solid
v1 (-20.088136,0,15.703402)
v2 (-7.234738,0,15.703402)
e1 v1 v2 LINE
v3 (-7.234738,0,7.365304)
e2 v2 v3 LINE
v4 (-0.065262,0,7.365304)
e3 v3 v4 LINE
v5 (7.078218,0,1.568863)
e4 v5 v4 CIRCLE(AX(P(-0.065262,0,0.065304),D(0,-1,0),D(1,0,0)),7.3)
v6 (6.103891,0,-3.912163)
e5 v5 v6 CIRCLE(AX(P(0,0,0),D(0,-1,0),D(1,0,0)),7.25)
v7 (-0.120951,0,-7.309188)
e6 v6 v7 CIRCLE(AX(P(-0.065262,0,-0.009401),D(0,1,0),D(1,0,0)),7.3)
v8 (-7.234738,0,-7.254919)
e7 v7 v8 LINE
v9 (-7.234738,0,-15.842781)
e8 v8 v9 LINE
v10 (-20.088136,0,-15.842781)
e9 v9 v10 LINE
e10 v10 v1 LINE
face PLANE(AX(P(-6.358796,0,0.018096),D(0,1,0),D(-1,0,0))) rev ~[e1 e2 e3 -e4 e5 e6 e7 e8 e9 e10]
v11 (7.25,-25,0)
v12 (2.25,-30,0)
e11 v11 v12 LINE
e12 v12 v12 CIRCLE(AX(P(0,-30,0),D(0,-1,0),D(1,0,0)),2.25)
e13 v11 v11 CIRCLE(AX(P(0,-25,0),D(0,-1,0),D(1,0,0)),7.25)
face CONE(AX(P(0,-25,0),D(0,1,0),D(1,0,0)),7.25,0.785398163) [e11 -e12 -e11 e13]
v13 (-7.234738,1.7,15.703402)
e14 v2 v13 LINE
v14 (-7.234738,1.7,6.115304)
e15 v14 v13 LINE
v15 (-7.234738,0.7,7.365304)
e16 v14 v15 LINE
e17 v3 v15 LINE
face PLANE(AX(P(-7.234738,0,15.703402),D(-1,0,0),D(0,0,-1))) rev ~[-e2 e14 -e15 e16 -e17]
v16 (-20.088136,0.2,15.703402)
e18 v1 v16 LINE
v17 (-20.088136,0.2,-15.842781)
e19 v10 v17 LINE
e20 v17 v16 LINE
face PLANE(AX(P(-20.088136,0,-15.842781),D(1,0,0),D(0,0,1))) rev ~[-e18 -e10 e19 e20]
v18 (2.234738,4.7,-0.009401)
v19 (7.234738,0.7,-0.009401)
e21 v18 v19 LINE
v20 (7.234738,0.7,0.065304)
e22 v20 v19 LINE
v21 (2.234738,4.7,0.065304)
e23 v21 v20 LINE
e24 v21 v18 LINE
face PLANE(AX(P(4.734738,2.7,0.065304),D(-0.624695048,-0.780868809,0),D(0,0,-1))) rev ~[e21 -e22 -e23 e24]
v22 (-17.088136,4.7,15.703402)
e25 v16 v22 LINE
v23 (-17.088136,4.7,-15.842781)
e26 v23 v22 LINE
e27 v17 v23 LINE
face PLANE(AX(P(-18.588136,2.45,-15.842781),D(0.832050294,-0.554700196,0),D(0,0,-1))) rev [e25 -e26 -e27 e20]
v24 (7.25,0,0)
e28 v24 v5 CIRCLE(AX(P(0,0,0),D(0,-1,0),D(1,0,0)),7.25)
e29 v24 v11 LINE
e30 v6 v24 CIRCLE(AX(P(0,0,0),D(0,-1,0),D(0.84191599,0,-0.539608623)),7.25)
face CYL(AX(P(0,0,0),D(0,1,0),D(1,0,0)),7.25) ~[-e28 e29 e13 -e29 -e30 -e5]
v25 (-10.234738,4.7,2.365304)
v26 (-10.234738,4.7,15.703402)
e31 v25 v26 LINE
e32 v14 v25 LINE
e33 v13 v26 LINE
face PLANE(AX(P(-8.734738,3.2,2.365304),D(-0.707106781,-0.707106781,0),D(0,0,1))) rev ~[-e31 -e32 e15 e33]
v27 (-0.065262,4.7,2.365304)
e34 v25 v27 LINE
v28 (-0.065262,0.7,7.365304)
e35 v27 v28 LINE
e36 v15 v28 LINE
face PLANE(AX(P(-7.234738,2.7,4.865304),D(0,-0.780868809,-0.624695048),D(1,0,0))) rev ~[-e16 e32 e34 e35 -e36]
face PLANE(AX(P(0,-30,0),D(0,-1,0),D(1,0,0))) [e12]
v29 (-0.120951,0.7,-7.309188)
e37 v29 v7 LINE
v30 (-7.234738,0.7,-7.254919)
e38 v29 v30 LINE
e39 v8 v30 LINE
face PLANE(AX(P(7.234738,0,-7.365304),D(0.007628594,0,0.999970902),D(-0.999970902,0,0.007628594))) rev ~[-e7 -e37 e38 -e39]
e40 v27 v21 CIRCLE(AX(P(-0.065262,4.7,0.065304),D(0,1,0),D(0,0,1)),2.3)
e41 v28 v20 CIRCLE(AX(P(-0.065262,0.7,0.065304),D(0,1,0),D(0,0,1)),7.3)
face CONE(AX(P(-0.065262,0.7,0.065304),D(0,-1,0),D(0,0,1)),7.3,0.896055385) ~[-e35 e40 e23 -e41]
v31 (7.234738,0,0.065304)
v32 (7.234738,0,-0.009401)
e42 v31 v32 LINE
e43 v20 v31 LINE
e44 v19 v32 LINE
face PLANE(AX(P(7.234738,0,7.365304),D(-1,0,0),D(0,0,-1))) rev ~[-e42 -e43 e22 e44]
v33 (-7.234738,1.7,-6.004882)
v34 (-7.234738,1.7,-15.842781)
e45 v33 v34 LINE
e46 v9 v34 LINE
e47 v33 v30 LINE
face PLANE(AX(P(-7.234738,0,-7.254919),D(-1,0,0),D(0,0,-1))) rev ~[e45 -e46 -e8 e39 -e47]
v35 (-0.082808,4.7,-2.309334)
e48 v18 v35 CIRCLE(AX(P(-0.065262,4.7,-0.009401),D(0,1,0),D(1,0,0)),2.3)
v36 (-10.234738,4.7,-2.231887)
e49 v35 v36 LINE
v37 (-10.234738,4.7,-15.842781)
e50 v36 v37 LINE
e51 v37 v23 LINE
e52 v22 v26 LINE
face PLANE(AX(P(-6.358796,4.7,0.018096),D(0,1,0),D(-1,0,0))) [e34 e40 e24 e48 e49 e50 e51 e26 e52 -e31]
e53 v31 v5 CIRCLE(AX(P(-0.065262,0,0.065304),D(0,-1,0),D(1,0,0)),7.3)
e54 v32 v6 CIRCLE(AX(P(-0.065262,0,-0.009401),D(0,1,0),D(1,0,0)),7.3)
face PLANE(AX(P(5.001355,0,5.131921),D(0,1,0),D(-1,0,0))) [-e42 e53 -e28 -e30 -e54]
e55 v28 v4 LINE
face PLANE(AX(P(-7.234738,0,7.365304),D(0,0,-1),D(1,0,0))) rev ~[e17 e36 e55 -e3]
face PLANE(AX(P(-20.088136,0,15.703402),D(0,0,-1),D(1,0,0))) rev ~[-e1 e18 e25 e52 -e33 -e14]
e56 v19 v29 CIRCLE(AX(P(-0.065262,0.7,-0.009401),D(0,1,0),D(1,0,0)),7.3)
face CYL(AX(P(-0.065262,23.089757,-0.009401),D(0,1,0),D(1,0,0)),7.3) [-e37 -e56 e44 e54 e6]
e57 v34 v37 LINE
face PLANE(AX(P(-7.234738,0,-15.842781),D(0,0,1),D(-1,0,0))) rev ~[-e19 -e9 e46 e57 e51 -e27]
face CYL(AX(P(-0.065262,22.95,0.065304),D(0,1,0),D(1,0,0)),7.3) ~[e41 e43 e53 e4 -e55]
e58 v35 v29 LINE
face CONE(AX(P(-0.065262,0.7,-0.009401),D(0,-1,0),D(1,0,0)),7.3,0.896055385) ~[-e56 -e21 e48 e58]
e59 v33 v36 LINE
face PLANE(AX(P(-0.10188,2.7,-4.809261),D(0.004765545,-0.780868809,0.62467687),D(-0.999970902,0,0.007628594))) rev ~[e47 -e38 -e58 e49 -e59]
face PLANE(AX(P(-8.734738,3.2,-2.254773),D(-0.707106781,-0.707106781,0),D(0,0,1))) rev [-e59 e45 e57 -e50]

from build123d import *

# Parameters (mm, degrees)
F0_R        = 7.25
F1_DEPTH    = 30
F3_DEPTH    = 4.7
F4_T1_DEPTH = 22.95
F4_T3_DEPTH = 23.089756942
F5_SIZE2    = 4
F5_SIZE     = 5
F6_SIZE2    = 3
F6_SIZE     = 4.5
F7_SIZE     = 5
F8_SIZE     = 3


# Not quite as in the source:
# - a fillet or chamfer that OpenCascade refuses, or shapes differently, is made with other operations: its cross-section is extruded or revolved along the edge and cut away or added


with BuildPart() as f1:
    # F0 (on Front) → F1 (new body)
    with BuildSketch(Plane.XZ):
        Circle(F0_R)
    extrude(amount=F1_DEPTH)

    # F2 (on face) → F3 (join)
    with BuildSketch(Plane(origin=(0, 0, 0), x_dir=(-1, 0, 0), z_dir=(0, 1, 0))):
        Polygon((20.0881361961, 7.1568624116), (7.2347377427, 7.3653035797), (-7.2347377427, 7.3653035797), (-7.2347377427, -7.3653035797), (7.2347377427, -7.2549186188), (20.0881361961, -7.1568624116), align=None)
        Polygon((7.2347377427, 15.7034024596), (7.2347377427, 7.3653035797), (20.0881361961, 7.1568624116), (20.0881361961, 15.7034024596), align=None)
        Polygon((20.0881361961, -15.8427814022), (20.0881361961, -7.1568624116), (7.2347377427, -7.2549186188), (7.2347377427, -15.8427814022), align=None)
    extrude(amount=F3_DEPTH)

    # F4: fillet of radius 7.3 on 2 edges, made by hand

    # F4_s2 → F4_t1 (cut)
    with BuildSketch(Plane.XZ.offset(-22.95)):
        with BuildLine():
            ThreePointArc((7.2347377427, 0.0653035797), (5.0966172454, 5.2271830824), (-0.0652622573, 7.3653035797))
            Line((-0.0652622573, 7.3653035797), (7.2347377427, 7.3653035797))
            Line((7.2347377427, 7.3653035797), (7.2347377427, 0.0653035797))
        make_face()
    extrude(amount=F4_T1_DEPTH, mode=Mode.SUBTRACT)

    # F4_s4 → F4_t3 (cut)
    with BuildSketch(Plane.XZ.offset(-23.089756942)):
        with BuildLine():
            ThreePointArc((7.2347377427, -0.0094008029), (5.0768906111, -5.190931839), (-0.120950991, -7.3091883865))
            Line((-0.120950991, -7.3091883865), (7.2347377427, -7.3653035797))
            Line((7.2347377427, -7.3653035797), (7.2347377427, -0.0094008029))
        make_face()
    extrude(amount=F4_T3_DEPTH, mode=Mode.SUBTRACT)

    # F5
    f5_edges = [f1.edges().sort_by_distance(p)[0] for p in [
        (5.096617, 4.7, 5.227183),
        (5.076891, 4.7, -5.190932),
    ]]
    chamfer(f5_edges, length=F5_SIZE, length2=F5_SIZE2)

    # F6
    f6_edges = [f1.edges().sort_by_distance(p)[0] for p in [
        (-20.088136, 4.7, -0.069689),
    ]]
    f6_side = f1.faces().sort_by_distance((-20.088136, 2.35, -0.069689))[0]
    chamfer(f6_edges, length=F6_SIZE, length2=F6_SIZE2, reference=f6_side)

    # F7
    f7_edges = [f1.edges().sort_by_distance(p)[0] for p in [
        (-7.25, -30, 0),
    ]]
    chamfer(f7_edges, length=F7_SIZE)

    # F8
    f8_edges = [f1.edges().sort_by_distance(p)[0] for p in [
        (-7.234738, 4.7, 11.534353),
        (-7.234738, 4.7, -11.54885),
    ]]
    chamfer(f8_edges, length=F8_SIZE)


solid = f1.part
